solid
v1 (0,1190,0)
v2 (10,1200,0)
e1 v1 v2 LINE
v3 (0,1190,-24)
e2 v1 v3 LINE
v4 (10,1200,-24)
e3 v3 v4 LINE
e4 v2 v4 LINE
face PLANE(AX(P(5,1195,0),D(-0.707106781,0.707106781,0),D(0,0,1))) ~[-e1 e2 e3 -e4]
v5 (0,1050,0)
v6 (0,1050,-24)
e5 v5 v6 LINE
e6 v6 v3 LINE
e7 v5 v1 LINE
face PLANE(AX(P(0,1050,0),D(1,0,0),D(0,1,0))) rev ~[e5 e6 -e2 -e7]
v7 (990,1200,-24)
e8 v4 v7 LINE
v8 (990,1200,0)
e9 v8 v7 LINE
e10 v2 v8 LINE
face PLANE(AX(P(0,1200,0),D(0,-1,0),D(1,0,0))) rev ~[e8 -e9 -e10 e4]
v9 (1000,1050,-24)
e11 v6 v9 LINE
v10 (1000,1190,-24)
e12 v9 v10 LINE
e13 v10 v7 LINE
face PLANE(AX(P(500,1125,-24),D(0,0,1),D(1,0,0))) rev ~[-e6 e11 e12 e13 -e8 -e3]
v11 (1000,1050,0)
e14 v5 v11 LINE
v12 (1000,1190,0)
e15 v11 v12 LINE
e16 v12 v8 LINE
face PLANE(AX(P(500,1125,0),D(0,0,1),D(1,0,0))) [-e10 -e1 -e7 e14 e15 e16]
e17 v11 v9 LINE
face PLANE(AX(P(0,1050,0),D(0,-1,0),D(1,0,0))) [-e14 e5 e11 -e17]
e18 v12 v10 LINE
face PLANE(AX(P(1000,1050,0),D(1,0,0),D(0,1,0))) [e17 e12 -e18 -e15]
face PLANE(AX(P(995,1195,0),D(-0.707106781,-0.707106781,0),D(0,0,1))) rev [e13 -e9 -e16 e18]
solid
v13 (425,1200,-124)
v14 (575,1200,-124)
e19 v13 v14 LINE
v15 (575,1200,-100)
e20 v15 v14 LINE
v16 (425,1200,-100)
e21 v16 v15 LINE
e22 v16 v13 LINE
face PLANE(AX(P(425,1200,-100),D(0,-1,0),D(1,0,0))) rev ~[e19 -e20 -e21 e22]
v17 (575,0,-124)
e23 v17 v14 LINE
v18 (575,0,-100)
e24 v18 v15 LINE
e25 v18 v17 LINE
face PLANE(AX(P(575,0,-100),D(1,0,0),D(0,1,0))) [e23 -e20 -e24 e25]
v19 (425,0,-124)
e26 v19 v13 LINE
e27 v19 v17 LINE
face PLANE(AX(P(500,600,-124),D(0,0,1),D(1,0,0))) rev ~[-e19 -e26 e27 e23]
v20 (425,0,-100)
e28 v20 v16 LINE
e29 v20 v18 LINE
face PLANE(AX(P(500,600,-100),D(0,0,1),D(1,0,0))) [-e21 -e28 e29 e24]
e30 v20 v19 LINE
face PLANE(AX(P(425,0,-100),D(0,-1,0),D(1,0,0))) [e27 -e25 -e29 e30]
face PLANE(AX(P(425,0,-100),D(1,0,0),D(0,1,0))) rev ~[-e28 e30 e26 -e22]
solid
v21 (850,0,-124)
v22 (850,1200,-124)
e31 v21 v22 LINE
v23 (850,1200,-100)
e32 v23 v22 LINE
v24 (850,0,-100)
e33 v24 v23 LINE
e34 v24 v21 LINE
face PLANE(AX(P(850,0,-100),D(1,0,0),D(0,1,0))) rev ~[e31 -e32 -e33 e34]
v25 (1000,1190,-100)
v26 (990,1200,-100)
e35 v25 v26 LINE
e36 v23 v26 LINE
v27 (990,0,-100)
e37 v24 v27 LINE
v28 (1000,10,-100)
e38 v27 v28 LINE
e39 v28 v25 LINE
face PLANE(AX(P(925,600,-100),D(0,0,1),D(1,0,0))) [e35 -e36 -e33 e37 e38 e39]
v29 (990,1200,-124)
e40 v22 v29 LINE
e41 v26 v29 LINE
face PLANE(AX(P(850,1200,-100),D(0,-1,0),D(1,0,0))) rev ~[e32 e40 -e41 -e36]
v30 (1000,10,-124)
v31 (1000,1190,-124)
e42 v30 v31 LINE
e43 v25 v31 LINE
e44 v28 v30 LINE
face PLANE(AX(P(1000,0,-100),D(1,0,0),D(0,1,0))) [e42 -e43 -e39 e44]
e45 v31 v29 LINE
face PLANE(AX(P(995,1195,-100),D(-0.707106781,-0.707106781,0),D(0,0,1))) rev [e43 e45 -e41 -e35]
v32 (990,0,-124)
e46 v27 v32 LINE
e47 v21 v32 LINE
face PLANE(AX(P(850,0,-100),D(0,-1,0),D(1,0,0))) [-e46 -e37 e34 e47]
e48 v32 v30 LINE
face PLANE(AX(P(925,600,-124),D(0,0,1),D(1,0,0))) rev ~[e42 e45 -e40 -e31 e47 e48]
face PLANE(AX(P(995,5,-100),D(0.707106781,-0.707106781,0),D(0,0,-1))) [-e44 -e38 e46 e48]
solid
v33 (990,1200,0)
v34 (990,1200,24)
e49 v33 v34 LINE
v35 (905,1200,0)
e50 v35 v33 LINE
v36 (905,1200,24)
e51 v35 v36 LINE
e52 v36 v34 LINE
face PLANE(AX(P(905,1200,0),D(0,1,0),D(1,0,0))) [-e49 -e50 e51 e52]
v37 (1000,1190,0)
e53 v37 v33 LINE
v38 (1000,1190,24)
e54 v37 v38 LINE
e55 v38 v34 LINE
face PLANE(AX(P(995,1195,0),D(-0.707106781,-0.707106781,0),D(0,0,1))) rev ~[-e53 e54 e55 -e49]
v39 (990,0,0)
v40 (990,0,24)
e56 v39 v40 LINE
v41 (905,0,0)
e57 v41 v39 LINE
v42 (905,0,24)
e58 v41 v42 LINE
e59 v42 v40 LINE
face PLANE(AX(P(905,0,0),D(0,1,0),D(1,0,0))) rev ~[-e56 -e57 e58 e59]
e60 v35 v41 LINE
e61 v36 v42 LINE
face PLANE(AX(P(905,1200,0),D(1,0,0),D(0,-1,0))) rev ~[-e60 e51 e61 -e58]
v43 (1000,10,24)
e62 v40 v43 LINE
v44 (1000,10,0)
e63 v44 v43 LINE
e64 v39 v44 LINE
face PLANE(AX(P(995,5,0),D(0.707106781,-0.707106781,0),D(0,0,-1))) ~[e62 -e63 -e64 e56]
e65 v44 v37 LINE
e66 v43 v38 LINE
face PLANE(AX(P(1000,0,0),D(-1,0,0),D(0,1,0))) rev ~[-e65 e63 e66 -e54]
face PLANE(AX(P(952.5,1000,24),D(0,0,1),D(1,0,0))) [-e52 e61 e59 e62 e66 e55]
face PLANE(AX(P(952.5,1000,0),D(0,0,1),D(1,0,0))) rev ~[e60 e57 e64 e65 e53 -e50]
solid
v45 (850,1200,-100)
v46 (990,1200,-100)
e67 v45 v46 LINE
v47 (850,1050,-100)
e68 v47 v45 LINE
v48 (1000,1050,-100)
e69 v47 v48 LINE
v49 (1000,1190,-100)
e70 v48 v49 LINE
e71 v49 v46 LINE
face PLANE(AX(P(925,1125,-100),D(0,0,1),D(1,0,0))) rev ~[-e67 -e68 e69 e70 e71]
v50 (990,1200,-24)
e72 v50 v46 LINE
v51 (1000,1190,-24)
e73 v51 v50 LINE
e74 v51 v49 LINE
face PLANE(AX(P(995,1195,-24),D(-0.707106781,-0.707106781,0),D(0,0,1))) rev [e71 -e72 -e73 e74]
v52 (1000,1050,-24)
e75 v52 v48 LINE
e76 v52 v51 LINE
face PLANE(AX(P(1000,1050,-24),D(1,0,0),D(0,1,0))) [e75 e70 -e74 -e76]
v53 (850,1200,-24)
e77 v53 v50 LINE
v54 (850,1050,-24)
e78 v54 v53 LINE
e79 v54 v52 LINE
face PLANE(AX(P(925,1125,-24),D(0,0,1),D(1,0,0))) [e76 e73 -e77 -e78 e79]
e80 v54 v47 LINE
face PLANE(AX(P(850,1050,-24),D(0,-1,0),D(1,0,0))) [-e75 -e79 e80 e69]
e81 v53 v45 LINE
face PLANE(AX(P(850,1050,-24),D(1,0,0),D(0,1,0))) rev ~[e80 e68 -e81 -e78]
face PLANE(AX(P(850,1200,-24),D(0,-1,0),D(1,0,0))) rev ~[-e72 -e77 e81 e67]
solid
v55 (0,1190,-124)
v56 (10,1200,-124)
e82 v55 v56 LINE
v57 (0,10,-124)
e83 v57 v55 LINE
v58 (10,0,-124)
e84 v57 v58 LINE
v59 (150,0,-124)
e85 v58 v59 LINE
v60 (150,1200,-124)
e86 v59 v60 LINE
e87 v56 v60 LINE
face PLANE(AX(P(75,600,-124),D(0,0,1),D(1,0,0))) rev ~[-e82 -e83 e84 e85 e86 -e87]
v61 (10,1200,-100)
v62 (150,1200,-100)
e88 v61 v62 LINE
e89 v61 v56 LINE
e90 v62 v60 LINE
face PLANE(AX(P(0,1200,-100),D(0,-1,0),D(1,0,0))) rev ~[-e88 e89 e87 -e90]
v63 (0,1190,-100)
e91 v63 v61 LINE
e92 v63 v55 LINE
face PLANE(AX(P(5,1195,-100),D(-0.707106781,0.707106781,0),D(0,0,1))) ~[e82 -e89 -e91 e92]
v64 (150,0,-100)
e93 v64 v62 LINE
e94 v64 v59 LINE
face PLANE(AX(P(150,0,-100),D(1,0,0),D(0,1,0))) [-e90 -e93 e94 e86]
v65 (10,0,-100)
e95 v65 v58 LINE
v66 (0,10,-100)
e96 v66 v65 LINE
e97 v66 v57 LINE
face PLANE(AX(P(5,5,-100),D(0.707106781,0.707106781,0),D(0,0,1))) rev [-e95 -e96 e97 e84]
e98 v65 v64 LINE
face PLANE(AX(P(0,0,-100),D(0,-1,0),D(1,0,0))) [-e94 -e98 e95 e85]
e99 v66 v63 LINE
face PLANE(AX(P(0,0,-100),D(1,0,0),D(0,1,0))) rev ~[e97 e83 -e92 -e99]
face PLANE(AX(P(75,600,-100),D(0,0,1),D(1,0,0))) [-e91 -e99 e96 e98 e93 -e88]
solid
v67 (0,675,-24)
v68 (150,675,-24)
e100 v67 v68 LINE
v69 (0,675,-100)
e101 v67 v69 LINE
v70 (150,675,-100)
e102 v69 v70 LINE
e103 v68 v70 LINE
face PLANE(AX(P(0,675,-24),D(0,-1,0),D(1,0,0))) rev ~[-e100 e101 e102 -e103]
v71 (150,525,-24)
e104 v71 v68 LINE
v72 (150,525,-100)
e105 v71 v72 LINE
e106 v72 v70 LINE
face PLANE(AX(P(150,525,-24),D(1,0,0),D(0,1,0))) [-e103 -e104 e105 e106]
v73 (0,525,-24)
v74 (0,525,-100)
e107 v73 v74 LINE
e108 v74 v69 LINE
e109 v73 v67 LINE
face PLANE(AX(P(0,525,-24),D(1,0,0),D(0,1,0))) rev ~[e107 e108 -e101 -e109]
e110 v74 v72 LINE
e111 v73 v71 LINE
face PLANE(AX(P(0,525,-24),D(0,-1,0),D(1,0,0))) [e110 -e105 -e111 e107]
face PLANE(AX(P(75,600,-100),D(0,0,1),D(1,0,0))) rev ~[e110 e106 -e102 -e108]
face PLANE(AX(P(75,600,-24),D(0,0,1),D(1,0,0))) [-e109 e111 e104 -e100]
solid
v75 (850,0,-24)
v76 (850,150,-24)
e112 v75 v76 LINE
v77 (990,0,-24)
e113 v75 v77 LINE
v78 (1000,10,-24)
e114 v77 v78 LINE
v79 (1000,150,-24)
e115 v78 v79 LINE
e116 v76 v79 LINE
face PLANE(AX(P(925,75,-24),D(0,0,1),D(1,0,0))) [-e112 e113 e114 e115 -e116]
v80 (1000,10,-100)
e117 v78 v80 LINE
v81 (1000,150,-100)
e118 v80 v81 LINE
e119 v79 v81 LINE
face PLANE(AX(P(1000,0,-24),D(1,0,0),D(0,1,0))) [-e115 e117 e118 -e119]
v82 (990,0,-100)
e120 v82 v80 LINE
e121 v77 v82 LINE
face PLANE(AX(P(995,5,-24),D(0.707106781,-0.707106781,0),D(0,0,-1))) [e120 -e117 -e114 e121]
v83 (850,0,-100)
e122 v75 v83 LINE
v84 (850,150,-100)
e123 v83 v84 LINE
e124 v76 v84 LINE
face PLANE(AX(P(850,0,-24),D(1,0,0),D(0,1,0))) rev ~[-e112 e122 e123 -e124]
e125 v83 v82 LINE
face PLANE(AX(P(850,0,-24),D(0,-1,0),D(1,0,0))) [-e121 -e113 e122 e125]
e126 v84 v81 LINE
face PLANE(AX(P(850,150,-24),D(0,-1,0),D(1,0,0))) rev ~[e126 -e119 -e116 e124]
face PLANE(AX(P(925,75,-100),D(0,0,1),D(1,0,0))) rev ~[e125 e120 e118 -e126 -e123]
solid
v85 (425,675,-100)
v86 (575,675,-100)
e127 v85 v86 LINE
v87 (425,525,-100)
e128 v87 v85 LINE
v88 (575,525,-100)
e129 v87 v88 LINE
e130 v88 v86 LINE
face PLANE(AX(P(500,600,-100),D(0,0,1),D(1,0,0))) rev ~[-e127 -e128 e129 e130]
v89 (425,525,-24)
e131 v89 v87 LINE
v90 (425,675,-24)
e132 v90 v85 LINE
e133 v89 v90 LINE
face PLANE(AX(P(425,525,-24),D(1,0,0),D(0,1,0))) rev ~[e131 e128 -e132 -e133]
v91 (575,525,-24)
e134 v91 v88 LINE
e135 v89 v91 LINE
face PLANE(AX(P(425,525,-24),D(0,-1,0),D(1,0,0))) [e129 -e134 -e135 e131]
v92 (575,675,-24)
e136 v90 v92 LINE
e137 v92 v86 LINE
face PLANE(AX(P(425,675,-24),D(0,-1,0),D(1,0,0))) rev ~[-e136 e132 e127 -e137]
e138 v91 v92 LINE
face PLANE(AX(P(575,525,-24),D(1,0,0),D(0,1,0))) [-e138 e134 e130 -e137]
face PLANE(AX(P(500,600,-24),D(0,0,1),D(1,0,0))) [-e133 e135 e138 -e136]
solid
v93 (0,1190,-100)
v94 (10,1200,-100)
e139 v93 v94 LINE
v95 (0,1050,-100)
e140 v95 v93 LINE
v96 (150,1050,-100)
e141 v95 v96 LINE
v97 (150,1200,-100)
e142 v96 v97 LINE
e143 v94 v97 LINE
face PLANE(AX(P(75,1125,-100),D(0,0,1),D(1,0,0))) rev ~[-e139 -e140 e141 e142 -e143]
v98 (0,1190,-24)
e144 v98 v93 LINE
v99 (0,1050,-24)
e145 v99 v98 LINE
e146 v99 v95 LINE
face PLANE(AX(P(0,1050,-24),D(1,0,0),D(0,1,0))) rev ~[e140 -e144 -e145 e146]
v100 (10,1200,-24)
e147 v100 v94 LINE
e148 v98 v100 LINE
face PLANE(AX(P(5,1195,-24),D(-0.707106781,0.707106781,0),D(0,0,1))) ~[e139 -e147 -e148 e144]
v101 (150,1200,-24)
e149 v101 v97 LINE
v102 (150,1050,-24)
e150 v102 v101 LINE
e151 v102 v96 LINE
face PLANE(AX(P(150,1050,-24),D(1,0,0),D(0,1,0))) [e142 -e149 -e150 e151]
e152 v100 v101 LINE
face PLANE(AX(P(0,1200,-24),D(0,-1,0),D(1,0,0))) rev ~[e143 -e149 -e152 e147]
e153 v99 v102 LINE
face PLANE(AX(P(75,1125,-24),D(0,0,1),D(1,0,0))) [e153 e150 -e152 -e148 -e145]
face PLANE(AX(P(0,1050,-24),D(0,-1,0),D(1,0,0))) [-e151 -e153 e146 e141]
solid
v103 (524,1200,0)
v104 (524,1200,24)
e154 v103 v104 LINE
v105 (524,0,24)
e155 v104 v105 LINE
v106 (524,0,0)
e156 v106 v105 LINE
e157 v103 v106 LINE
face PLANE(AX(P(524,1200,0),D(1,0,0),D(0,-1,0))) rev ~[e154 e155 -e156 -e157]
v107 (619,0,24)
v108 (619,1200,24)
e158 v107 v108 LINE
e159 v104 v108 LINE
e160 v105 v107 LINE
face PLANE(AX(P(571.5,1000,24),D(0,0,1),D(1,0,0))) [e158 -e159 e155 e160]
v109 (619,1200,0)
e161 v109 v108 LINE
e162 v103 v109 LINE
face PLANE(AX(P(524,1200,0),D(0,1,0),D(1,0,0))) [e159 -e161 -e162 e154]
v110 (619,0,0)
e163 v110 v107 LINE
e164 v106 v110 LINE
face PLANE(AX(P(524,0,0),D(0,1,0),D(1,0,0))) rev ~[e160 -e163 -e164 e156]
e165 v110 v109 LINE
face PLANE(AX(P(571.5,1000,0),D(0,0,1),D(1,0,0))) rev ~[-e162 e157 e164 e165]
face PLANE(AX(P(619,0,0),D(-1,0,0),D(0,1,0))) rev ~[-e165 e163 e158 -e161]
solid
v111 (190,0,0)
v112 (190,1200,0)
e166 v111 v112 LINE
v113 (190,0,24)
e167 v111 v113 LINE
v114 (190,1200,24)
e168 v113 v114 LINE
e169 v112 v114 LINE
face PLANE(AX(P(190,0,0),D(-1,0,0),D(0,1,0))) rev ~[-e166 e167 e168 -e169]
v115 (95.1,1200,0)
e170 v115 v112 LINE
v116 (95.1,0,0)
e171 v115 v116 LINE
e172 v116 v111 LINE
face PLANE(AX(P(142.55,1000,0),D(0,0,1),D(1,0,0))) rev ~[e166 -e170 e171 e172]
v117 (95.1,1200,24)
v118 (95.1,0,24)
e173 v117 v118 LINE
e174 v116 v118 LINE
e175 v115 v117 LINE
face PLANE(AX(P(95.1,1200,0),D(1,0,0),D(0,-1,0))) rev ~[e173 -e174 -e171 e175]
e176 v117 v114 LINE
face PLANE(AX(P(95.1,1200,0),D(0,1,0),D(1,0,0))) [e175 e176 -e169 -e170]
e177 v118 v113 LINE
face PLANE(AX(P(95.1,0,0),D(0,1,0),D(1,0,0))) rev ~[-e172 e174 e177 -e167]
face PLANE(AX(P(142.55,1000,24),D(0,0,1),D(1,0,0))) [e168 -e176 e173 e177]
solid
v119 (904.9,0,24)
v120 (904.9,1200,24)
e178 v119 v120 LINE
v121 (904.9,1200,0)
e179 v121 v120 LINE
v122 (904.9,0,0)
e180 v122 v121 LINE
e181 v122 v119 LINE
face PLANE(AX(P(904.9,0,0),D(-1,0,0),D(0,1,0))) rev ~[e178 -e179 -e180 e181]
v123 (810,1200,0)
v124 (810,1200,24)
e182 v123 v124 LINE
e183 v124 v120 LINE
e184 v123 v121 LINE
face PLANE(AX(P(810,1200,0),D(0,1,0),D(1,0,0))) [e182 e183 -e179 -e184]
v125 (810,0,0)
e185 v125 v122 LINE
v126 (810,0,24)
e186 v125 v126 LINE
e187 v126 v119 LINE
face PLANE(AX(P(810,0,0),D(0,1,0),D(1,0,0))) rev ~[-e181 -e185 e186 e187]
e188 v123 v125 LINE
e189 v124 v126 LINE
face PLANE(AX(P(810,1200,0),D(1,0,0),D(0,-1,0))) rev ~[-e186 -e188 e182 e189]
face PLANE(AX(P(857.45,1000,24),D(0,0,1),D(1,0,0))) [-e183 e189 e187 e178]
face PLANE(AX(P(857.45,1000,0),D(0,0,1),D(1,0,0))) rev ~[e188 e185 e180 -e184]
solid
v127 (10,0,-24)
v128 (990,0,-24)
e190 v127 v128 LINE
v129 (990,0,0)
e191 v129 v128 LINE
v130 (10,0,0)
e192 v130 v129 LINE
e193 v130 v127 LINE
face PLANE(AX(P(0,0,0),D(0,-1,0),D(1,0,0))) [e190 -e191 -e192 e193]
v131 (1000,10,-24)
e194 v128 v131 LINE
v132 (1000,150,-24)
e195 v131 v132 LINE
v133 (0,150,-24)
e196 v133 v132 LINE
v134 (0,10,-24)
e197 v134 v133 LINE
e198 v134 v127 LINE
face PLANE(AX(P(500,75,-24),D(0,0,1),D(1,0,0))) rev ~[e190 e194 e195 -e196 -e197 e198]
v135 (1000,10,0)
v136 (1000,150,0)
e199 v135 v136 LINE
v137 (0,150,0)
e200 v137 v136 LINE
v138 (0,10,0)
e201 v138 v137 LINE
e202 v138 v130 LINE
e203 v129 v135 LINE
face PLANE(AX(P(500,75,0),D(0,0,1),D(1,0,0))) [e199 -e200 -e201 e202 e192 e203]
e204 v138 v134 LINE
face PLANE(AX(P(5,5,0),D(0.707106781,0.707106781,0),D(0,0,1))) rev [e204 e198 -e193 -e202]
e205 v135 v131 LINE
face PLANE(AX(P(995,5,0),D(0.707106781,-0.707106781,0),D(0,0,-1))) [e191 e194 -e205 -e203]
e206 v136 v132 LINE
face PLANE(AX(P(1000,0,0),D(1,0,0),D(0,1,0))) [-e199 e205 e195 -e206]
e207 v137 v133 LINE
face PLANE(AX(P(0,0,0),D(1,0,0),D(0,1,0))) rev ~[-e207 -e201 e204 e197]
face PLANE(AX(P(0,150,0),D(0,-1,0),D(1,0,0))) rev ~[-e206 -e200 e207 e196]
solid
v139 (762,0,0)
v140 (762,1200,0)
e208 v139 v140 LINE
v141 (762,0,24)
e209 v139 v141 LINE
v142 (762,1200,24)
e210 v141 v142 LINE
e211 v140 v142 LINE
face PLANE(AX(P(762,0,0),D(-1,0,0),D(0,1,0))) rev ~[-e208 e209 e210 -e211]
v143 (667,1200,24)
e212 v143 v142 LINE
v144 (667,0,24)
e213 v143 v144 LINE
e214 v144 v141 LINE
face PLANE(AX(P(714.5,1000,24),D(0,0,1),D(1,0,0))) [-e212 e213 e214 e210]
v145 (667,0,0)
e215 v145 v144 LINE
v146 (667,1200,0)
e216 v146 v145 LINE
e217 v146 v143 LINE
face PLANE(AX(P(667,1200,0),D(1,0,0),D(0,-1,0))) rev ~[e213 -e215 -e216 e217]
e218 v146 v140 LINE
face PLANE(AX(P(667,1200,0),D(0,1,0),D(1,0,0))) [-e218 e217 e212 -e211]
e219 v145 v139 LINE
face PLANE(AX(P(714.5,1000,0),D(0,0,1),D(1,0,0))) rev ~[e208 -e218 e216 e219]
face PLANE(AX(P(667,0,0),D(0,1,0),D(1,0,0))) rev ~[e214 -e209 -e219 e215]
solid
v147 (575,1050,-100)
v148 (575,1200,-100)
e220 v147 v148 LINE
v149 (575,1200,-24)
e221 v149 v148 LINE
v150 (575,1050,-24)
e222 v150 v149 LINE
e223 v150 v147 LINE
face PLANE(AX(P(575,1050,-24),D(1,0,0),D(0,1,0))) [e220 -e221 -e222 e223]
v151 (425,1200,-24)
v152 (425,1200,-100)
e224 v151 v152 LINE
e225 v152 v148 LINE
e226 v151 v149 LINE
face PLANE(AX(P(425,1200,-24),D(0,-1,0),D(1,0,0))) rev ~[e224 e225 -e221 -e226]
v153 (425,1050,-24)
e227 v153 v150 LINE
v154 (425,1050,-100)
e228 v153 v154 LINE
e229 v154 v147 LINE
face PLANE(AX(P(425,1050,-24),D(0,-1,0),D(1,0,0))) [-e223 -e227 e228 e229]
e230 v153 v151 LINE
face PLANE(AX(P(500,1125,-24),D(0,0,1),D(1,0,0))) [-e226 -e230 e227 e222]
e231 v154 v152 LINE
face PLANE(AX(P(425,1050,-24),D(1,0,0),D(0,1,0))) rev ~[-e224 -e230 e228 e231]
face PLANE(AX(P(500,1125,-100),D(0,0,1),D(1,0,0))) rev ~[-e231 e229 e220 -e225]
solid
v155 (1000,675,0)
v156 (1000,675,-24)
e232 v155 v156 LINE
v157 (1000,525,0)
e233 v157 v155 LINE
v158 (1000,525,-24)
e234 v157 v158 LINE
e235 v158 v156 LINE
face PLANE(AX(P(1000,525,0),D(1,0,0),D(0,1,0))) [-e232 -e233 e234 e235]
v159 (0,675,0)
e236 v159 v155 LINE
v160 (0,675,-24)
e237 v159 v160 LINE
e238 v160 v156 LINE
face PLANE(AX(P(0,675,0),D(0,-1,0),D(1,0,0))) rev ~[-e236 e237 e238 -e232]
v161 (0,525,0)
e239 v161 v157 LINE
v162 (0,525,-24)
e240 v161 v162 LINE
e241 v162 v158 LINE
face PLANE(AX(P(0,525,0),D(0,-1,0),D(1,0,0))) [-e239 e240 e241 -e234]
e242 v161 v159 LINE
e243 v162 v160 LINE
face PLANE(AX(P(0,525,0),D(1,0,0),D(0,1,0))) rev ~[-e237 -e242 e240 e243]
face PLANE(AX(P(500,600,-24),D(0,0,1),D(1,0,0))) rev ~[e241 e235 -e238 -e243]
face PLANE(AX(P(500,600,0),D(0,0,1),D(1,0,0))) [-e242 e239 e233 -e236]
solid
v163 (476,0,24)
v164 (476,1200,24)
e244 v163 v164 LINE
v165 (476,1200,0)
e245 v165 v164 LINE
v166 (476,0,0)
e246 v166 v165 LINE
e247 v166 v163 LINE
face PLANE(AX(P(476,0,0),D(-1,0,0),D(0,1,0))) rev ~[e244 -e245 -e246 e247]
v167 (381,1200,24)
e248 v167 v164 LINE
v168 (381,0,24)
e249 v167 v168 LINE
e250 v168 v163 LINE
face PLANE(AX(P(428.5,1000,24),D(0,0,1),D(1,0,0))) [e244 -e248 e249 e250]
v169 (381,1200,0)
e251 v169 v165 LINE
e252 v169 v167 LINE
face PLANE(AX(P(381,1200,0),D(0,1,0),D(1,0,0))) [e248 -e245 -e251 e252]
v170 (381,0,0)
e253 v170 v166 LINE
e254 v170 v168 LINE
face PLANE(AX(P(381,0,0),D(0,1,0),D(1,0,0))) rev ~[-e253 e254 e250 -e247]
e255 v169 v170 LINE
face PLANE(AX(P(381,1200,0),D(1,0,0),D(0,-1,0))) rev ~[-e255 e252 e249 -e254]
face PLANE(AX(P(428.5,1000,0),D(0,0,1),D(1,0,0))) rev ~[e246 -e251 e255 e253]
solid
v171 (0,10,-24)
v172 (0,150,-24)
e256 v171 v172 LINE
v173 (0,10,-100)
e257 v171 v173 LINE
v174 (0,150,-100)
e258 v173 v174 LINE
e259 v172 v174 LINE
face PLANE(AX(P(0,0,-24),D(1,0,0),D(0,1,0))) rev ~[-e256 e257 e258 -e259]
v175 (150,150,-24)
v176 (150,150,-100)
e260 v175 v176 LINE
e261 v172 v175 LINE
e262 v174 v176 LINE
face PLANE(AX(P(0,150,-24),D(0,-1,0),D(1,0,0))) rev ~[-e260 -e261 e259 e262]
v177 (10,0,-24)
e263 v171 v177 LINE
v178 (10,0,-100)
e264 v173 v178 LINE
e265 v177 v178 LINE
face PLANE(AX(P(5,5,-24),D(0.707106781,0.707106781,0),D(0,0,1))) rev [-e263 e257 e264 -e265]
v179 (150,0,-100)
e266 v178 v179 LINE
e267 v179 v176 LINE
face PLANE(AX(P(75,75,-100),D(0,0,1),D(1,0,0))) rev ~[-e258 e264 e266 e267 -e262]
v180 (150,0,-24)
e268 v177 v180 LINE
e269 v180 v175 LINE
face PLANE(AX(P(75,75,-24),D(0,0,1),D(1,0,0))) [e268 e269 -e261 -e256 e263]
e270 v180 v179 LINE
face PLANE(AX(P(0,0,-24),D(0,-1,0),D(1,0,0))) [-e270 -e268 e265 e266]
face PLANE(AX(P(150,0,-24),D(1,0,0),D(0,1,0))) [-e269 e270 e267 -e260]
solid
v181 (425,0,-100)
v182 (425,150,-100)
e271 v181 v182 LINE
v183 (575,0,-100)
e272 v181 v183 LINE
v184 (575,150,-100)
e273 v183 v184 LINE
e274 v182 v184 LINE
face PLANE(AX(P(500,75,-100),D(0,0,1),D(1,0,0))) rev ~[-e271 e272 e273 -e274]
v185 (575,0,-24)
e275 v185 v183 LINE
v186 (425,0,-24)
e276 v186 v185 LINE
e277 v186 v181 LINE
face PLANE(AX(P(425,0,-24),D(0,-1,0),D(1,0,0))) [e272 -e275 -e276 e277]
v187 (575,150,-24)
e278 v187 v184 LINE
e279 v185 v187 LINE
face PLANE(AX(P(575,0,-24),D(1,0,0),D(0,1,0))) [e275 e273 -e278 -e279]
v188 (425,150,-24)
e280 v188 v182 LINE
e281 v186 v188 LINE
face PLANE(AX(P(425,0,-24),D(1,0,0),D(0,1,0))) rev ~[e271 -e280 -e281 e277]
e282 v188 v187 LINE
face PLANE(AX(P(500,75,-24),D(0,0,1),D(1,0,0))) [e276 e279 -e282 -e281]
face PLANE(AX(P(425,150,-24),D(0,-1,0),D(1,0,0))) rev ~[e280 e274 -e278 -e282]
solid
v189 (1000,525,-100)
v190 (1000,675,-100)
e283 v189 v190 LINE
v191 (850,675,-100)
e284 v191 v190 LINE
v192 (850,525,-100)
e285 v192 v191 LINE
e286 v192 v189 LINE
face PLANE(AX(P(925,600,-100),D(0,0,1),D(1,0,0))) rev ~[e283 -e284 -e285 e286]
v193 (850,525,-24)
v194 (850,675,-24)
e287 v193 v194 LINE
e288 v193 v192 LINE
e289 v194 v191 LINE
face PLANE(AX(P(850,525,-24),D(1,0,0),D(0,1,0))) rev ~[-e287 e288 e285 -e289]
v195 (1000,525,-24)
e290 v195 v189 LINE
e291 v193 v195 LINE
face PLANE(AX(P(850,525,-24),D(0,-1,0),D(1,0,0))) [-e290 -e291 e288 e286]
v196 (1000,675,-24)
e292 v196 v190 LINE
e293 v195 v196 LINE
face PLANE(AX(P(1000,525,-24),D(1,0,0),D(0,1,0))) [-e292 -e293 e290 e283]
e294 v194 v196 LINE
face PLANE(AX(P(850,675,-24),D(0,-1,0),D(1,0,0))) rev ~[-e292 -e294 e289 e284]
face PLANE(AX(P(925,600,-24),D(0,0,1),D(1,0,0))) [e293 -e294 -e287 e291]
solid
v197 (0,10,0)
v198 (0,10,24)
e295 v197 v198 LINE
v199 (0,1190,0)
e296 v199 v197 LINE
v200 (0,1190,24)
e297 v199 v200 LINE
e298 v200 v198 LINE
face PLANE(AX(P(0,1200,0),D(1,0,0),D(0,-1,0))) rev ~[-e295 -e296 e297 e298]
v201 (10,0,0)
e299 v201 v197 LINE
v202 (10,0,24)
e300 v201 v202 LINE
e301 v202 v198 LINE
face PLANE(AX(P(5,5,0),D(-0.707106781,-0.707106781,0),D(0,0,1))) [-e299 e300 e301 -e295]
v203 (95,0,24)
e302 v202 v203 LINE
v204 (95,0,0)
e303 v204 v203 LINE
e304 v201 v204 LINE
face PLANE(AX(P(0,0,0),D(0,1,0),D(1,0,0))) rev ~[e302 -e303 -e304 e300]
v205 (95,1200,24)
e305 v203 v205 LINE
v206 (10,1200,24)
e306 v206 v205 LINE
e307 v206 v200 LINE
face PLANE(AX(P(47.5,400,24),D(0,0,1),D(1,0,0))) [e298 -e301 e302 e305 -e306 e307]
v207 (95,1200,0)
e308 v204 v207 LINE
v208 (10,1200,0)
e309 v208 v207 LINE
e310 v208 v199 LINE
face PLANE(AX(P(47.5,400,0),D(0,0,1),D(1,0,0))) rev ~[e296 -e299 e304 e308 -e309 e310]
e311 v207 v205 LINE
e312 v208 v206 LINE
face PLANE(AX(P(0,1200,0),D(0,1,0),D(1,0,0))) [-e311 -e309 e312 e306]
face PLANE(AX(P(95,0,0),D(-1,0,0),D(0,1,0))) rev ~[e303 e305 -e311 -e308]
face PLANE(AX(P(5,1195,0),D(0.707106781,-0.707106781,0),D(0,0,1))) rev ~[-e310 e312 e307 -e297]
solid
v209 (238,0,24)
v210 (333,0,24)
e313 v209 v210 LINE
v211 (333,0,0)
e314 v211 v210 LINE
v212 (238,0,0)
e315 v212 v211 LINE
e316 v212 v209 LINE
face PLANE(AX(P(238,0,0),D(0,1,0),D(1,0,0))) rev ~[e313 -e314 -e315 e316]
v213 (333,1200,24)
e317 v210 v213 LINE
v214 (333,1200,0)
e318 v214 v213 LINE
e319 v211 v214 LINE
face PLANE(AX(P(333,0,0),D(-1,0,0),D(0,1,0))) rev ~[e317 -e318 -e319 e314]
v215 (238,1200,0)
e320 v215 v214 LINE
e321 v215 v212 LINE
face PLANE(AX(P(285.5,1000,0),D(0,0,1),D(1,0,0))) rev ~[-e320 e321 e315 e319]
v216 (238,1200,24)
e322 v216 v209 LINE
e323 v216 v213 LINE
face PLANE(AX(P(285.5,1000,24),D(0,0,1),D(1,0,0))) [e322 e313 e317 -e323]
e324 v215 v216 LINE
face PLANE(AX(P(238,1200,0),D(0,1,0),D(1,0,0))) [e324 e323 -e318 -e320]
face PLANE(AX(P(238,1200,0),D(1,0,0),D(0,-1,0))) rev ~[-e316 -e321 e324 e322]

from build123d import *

# Parameters (mm, degrees)
F0_W        = 95
F0_H        = 800
F0_H_2      = 400
F1_DEPTH    = 24
F0_W_2      = 94.9
F2_W        = 1000
F2_H        = 150
F3_DEPTH    = 24
F5_W        = 150
F5_H        = 150
F6_DEPTH    = 76
F8_W        = 150
F8_H        = 1200
F9_DEPTH    = 24
F10_SIZE    = 10
F10_2_SIZE  = 10
F10_3_SIZE  = 10
F10_4_SIZE  = 10
F10_5_SIZE  = 10
F10_6_SIZE  = 10
F10_7_SIZE  = 10
F10_8_SIZE  = 10
F10_9_SIZE  = 10
F10_10_SIZE = 10


# Not quite as in the source:
# - a feature names something its author has since deleted; it is built from what else it names


with BuildPart() as f1:
    # F0 (on Top) → F1 (new body)
    with BuildSketch(Plane.XY):
        with Locations((47.5, 400)):
            Rectangle(F0_W, F0_H)
        with Locations((47.5, 1000)):
            Rectangle(F0_W, F0_H_2)
    extrude(amount=F1_DEPTH)

    # F10#3
    f10_3_edges = [f1.edges().sort_by_distance(p)[0] for p in [
        (0, 0, 12),
        (0, 1200, 12),
    ]]
    chamfer(f10_3_edges, length=F10_3_SIZE)


with BuildPart() as f1b:
    # F0 (on Top) → F1, piece 2 (new body)
    with BuildSketch(Plane.XY):
        with Locations((952.5, 1000)):
            Rectangle(F0_W, F0_H_2)
        with Locations((952.5, 400)):
            Rectangle(F0_W, F0_H)
    extrude(amount=F1_DEPTH)

    # F10#7
    f10_7_edges = [f1b.edges().sort_by_distance(p)[0] for p in [
        (1000, 0, 12),
        (1000, 1200, 12),
    ]]
    chamfer(f10_7_edges, length=F10_7_SIZE)


with BuildPart() as f1c:
    # F0 (on Top) → F1, piece 3 (new body)
    with BuildSketch(Plane.XY):
        with Locations((857.45, 1000)):
            Rectangle(F0_W_2, F0_H_2)
        with Locations((857.45, 400)):
            Rectangle(F0_W_2, F0_H)
    extrude(amount=F1_DEPTH)


with BuildPart() as f1d:
    # F0 (on Top) → F1, piece 4 (new body)
    with BuildSketch(Plane.XY):
        with Locations((714.5, 1000)):
            Rectangle(F0_W, F0_H_2)
        with Locations((714.5, 400)):
            Rectangle(F0_W, F0_H)
    extrude(amount=F1_DEPTH)


with BuildPart() as f1e:
    # F0 (on Top) → F1, piece 5 (new body)
    with BuildSketch(Plane.XY):
        with Locations((571.5, 1000)):
            Rectangle(F0_W, F0_H_2)
        with Locations((571.5, 400)):
            Rectangle(F0_W, F0_H)
    extrude(amount=F1_DEPTH)


with BuildPart() as f1f:
    # F0 (on Top) → F1, piece 6 (new body)
    with BuildSketch(Plane.XY):
        with Locations((428.5, 1000)):
            Rectangle(F0_W, F0_H_2)
        with Locations((428.5, 400)):
            Rectangle(F0_W, F0_H)
    extrude(amount=F1_DEPTH)


with BuildPart() as f1g:
    # F0 (on Top) → F1, piece 7 (new body)
    with BuildSketch(Plane.XY):
        with Locations((285.5, 1000)):
            Rectangle(F0_W, F0_H_2)
        with Locations((285.5, 400)):
            Rectangle(F0_W, F0_H)
    extrude(amount=F1_DEPTH)


with BuildPart() as f1h:
    # F0 (on Top) → F1, piece 8 (new body)
    with BuildSketch(Plane.XY):
        with Locations((142.55, 1000)):
            Rectangle(F0_W_2, F0_H_2)
        with Locations((142.55, 400)):
            Rectangle(F0_W_2, F0_H)
    extrude(amount=F1_DEPTH)


with BuildPart() as f3:
    # F2 (on Top) → F3 (new body)
    with BuildSketch(Plane.XY):
        with Locations((500, 75)):
            Rectangle(F2_W, F2_H)
    extrude(amount=-F3_DEPTH)

    # F10#2
    f10_2_edges = [f3.edges().sort_by_distance(p)[0] for p in [
        (0, 0, -12),
        (1000, 0, -12),
    ]]
    chamfer(f10_2_edges, length=F10_2_SIZE)


with BuildPart() as f3b:
    # F2 (on Top) → F3, piece 2 (new body)
    with BuildSketch(Plane.XY):
        with Locations((500, 600)):
            Rectangle(F2_W, F2_H)
    extrude(amount=-F3_DEPTH)


with BuildPart() as f3c:
    # F2 (on Top) → F3, piece 3 (new body)
    with BuildSketch(Plane.XY):
        with Locations((500, 1125)):
            Rectangle(F2_W, F2_H)
    extrude(amount=-F3_DEPTH)

    # F10#8
    f10_8_edges = [f3c.edges().sort_by_distance(p)[0] for p in [
        (1000, 1200, -12),
        (0, 1200, -12),
    ]]
    chamfer(f10_8_edges, length=F10_8_SIZE)


with BuildPart() as f6:
    # F5 (on offset) → F6 (new body)
    with BuildSketch(Plane.XY.offset(-24)):
        with Locations((75, 75)):
            Rectangle(F5_W, F5_H)
    extrude(amount=-F6_DEPTH)

    # F10
    f10_edges = [f6.edges().sort_by_distance(p)[0] for p in [
        (0, 0, -62),
    ]]
    chamfer(f10_edges, length=F10_SIZE)


with BuildPart() as f6b:
    # F5 (on offset) → F6, piece 2 (new body)
    with BuildSketch(Plane.XY.offset(-24)):
        with Locations((75, 600)):
            Rectangle(F5_W, F5_H)
    extrude(amount=-F6_DEPTH)


with BuildPart() as f6c:
    # F5 (on offset) → F6, piece 3 (new body)
    with BuildSketch(Plane.XY.offset(-24)):
        with Locations((75, 1125)):
            Rectangle(F5_W, F5_H)
    extrude(amount=-F6_DEPTH)

    # F10#10
    f10_10_edges = [f6c.edges().sort_by_distance(p)[0] for p in [
        (0, 1200, -62),
    ]]
    chamfer(f10_10_edges, length=F10_10_SIZE)


with BuildPart() as f6d:
    # F5 (on offset) → F6, piece 4 (new body)
    with BuildSketch(Plane.XY.offset(-24)):
        with Locations((500, 75)):
            Rectangle(F5_W, F5_H)
    extrude(amount=-F6_DEPTH)


with BuildPart() as f6e:
    # F5 (on offset) → F6, piece 5 (new body)
    with BuildSketch(Plane.XY.offset(-24)):
        with Locations((500, 1125)):
            Rectangle(F5_W, F5_H)
    extrude(amount=-F6_DEPTH)


with BuildPart() as f6f:
    # F5 (on offset) → F6, piece 6 (new body)
    with BuildSketch(Plane.XY.offset(-24)):
        with Locations((925, 75)):
            Rectangle(F5_W, F5_H)
    extrude(amount=-F6_DEPTH)

    # F10#6
    f10_6_edges = [f6f.edges().sort_by_distance(p)[0] for p in [
        (1000, 0, -62),
    ]]
    chamfer(f10_6_edges, length=F10_6_SIZE)


with BuildPart() as f6g:
    # F5 (on offset) → F6, piece 7 (new body)
    with BuildSketch(Plane.XY.offset(-24)):
        with Locations((925, 1125)):
            Rectangle(F5_W, F5_H)
    extrude(amount=-F6_DEPTH)

    # F10#9
    f10_9_edges = [f6g.edges().sort_by_distance(p)[0] for p in [
        (1000, 1200, -62),
    ]]
    chamfer(f10_9_edges, length=F10_9_SIZE)


with BuildPart() as f6h:
    # F5 (on offset) → F6, piece 8 (new body)
    with BuildSketch(Plane.XY.offset(-24)):
        with Locations((925, 600)):
            Rectangle(F5_W, F5_H)
    extrude(amount=-F6_DEPTH)


with BuildPart() as f6i:
    # F5 (on offset) → F6, piece 9 (new body)
    with BuildSketch(Plane.XY.offset(-24)):
        with Locations((500, 600)):
            Rectangle(F5_W, F5_H)
    extrude(amount=-F6_DEPTH)


with BuildPart() as f9:
    # F8 (on offset) → F9 (new body)
    with BuildSketch(Plane.XY.offset(-100)):
        with Locations((75, 600)):
            Rectangle(F8_W, F8_H)
    extrude(amount=-F9_DEPTH)

    # F10#4
    f10_4_edges = [f9.edges().sort_by_distance(p)[0] for p in [
        (0, 0, -112),
        (0, 1200, -112),
    ]]
    chamfer(f10_4_edges, length=F10_4_SIZE)


with BuildPart() as f9b:
    # F8 (on offset) → F9, piece 2 (new body)
    with BuildSketch(Plane.XY.offset(-100)):
        with Locations((500, 600)):
            Rectangle(F8_W, F8_H)
    extrude(amount=-F9_DEPTH)


with BuildPart() as f9c:
    # F8 (on offset) → F9, piece 3 (new body)
    with BuildSketch(Plane.XY.offset(-100)):
        with Locations((925, 600)):
            Rectangle(F8_W, F8_H)
    extrude(amount=-F9_DEPTH)

    # F10#5
    f10_5_edges = [f9c.edges().sort_by_distance(p)[0] for p in [
        (1000, 0, -112),
        (1000, 1200, -112),
    ]]
    chamfer(f10_5_edges, length=F10_5_SIZE)


solid = Compound([f1.part, f1b.part, f1c.part, f1d.part, f1e.part, f1f.part, f1g.part, f1h.part, f3.part, f3b.part, f3c.part, f6.part, f6b.part, f6c.part, f6d.part, f6e.part, f6f.part, f6g.part, f6h.part, f6i.part, f9.part, f9b.part, f9c.part])
